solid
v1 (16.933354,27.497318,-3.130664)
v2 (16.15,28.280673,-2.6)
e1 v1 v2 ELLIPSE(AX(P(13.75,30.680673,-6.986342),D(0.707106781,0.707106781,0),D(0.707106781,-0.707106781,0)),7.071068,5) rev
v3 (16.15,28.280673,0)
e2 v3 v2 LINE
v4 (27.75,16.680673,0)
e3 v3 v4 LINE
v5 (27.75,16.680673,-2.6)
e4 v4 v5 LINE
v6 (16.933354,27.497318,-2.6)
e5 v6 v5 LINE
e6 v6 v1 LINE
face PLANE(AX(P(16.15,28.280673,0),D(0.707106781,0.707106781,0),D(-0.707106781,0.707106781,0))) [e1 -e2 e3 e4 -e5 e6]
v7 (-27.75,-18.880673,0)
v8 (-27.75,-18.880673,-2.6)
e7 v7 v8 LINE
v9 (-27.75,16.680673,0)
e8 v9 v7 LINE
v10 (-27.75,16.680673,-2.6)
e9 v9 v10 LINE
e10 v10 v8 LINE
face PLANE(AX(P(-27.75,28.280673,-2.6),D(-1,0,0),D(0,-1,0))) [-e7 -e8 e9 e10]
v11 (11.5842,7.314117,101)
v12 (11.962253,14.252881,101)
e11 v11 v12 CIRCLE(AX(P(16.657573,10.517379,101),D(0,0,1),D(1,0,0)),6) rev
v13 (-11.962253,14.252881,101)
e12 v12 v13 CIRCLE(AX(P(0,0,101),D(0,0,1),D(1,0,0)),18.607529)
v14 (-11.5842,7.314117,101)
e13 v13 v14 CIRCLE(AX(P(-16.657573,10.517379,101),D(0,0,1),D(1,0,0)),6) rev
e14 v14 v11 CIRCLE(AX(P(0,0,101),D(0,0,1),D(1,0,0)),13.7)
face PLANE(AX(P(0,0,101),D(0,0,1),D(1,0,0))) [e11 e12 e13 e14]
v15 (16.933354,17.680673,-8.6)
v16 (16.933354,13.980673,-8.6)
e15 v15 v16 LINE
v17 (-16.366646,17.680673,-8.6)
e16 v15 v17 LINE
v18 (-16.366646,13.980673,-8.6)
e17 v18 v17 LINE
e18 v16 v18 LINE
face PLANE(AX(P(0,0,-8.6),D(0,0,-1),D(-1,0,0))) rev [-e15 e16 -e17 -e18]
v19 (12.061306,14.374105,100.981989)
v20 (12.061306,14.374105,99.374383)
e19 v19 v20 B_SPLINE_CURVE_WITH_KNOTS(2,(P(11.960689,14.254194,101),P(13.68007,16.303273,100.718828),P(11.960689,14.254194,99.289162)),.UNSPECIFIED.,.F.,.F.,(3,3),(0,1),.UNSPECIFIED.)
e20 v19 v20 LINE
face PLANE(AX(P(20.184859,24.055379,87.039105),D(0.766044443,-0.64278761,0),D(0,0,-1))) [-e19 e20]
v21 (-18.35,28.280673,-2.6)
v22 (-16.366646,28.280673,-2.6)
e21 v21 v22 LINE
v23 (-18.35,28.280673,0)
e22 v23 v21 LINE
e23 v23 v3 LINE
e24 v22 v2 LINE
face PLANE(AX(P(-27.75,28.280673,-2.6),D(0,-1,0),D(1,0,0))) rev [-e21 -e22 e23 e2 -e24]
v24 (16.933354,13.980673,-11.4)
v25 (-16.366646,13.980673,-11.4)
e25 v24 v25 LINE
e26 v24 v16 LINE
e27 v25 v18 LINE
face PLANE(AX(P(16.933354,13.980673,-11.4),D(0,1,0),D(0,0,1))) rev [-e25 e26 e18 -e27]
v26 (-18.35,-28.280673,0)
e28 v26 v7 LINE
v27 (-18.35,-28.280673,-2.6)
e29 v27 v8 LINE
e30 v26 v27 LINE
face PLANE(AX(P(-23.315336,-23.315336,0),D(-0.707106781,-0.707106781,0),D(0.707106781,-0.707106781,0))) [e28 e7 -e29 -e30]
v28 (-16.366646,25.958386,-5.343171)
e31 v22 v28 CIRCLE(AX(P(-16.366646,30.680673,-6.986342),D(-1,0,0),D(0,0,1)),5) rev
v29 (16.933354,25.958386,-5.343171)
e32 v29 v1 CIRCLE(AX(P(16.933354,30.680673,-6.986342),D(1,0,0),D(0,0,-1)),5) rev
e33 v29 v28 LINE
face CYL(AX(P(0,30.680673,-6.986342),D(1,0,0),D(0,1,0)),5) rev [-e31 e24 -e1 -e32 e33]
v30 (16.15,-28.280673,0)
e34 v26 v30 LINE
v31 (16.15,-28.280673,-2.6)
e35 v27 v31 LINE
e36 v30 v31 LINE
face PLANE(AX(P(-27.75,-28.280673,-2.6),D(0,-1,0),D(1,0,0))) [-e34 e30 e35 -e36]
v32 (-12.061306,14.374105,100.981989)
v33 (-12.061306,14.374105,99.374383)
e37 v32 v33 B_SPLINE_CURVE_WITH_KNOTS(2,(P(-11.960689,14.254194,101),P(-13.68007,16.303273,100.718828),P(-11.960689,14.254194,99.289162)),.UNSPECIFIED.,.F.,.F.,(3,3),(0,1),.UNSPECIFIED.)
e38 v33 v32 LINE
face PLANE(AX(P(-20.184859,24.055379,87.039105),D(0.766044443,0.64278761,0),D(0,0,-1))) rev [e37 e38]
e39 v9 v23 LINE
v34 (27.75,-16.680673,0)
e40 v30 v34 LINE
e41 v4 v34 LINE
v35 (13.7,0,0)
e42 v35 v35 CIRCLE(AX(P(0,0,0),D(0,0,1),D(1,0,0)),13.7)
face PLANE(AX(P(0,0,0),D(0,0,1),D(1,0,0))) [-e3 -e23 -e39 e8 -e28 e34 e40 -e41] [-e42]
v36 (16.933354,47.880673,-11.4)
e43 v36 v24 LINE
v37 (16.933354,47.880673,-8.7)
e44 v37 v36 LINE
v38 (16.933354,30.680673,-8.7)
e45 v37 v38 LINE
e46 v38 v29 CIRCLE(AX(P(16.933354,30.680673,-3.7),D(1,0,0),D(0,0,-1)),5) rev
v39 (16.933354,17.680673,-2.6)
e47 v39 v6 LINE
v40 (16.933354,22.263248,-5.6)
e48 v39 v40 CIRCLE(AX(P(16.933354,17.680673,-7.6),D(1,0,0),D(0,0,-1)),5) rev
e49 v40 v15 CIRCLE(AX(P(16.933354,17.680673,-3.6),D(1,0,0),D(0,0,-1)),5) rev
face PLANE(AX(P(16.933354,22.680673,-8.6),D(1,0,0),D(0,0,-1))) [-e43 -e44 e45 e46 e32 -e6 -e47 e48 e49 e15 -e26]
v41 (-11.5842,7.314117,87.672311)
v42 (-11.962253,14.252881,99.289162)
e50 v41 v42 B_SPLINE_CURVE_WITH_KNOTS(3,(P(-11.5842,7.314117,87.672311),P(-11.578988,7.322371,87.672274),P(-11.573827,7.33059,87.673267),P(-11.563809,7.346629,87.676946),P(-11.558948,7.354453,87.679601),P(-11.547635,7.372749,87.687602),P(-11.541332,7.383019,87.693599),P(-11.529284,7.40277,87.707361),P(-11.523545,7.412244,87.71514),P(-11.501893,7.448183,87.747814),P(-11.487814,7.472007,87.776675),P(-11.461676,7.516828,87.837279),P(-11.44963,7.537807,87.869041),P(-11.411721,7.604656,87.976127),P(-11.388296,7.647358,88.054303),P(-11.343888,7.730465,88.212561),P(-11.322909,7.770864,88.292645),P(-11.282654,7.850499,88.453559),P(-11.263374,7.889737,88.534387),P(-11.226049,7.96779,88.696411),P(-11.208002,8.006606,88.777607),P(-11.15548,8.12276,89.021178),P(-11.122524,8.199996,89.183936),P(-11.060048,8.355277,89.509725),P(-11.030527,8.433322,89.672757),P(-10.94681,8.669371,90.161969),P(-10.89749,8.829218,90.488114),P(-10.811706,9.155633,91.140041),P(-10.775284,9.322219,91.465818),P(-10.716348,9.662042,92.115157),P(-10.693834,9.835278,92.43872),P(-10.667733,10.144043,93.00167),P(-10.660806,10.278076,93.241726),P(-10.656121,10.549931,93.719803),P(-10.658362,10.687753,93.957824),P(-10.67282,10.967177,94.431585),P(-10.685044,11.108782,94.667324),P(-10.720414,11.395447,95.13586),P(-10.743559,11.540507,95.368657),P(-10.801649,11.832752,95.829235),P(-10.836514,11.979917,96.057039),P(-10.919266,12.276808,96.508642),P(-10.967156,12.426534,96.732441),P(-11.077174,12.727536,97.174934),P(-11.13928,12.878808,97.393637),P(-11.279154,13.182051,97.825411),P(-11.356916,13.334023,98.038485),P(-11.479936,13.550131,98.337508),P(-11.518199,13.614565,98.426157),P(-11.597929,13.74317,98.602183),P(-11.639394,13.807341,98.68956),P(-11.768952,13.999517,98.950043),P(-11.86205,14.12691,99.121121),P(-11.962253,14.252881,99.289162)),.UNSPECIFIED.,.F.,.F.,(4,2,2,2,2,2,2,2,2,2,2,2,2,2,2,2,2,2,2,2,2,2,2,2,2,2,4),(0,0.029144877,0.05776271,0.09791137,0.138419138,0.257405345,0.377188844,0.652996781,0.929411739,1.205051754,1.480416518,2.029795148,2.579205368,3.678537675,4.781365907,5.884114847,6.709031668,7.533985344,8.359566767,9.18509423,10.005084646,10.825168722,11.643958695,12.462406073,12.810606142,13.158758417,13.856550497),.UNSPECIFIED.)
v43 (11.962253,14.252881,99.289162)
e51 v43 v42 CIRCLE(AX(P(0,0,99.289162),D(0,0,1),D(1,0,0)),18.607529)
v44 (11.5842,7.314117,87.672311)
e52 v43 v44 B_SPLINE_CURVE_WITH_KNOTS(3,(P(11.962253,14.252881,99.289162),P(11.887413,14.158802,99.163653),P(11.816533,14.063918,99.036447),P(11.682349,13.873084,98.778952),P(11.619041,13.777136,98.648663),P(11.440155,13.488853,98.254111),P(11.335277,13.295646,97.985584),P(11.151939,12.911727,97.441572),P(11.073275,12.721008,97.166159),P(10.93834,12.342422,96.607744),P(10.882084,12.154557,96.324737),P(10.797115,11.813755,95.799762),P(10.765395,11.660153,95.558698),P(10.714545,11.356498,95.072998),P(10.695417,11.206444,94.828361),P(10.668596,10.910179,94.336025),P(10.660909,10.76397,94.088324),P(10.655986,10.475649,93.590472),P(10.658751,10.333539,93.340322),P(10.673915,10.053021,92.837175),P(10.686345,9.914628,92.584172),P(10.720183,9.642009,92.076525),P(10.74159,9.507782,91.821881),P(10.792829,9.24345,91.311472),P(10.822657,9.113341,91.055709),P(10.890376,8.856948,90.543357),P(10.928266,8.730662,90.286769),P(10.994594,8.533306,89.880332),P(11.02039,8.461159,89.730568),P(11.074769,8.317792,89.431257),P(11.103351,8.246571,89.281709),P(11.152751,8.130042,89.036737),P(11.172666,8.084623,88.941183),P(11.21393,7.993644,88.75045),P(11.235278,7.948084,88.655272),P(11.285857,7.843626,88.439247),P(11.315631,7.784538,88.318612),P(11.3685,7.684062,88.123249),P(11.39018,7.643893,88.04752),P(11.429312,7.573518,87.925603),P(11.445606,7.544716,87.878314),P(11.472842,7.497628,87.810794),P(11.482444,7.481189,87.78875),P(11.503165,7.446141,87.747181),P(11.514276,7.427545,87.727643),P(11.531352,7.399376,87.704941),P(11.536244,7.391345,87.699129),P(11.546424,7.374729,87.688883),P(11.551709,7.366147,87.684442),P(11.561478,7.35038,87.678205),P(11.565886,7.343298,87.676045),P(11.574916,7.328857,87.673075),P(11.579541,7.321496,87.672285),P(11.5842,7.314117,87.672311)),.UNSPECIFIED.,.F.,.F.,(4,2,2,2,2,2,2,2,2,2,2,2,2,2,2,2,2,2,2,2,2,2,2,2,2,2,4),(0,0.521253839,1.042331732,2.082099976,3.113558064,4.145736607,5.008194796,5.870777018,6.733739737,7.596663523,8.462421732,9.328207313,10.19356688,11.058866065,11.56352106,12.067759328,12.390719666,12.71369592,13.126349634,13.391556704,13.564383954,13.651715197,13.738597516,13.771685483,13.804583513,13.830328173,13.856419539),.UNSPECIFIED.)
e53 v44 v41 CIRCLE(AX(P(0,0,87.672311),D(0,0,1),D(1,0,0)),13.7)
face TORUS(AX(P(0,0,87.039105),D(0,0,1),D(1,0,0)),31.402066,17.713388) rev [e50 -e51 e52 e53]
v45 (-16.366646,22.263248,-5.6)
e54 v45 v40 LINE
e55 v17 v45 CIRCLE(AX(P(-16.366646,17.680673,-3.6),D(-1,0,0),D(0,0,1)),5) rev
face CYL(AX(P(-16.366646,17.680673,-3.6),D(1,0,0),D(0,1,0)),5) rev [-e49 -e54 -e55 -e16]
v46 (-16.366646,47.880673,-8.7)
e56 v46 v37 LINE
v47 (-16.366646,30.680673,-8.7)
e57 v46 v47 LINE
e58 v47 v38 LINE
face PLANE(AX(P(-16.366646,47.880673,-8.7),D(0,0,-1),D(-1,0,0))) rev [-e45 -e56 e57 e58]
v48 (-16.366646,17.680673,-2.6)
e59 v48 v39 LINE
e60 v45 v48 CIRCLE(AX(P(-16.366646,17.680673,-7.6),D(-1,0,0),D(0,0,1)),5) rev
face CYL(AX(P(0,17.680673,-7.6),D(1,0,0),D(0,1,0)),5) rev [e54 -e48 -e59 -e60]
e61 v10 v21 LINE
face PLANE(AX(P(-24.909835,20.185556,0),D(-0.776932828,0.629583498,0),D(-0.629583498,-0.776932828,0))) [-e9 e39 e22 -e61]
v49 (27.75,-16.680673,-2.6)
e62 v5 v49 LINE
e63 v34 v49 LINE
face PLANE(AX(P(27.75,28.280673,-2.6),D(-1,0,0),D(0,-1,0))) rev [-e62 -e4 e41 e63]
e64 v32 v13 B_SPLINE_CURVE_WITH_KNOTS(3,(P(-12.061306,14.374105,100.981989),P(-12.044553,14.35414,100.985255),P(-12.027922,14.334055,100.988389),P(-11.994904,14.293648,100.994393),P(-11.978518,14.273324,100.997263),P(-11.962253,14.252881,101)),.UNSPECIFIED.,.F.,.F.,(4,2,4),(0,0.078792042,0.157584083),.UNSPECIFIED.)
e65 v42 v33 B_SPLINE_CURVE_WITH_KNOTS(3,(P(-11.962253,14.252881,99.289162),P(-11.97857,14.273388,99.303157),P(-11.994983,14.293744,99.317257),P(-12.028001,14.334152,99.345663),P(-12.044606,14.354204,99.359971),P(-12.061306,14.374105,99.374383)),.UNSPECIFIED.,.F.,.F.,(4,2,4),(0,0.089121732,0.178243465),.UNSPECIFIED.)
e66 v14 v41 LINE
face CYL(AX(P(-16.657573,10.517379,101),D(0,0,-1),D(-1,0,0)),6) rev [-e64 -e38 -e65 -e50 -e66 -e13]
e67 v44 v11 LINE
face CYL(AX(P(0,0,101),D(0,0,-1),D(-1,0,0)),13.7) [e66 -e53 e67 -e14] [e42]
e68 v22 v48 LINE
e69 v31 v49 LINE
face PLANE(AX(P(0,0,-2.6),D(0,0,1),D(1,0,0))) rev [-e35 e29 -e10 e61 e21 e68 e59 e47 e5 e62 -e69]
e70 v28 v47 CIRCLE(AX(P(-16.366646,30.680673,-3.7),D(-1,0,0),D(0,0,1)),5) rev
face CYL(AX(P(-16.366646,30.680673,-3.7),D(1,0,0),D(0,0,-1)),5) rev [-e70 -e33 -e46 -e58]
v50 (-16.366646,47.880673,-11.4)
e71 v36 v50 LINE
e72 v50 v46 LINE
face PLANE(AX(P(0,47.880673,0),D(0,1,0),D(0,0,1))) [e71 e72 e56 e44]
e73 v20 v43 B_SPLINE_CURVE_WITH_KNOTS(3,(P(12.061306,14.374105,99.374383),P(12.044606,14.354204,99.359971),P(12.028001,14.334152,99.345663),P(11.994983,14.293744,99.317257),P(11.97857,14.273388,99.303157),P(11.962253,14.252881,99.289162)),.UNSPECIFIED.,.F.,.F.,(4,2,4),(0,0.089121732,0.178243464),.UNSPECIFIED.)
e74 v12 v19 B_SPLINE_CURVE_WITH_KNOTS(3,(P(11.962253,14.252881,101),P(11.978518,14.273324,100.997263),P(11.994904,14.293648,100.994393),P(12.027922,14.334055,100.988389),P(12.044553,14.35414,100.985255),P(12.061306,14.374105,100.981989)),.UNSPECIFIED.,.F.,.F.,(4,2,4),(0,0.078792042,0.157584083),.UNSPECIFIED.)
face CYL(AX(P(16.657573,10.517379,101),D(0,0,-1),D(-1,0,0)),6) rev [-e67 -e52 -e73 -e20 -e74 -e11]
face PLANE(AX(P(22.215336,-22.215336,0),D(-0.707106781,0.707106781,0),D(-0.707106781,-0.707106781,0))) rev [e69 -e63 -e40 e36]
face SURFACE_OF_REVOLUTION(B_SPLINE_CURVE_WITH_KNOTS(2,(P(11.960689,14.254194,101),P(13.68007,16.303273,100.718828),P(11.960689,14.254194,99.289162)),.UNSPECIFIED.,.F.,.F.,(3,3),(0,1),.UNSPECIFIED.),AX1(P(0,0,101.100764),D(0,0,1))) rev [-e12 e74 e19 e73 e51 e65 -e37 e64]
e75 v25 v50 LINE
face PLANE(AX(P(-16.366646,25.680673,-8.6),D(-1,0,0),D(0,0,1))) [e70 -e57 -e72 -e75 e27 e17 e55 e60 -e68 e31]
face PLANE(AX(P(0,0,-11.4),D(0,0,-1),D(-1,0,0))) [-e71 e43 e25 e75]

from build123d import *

# Parameters (mm, degrees)
SKETCH1_R                = 13.7
BOSS_EXTRUDE1_DEPTH      = 101
SKETCH5_W                = 55.5
SKETCH5_H                = 56.561345004
BOSS_EXTRUDE2_DEPTH      = 2.6
CUT_EXTRUDE4_DEPTH       = 2.6
BOSS_EXTRUDE4_DEPTH      = 6
SKETCH8_W                = 33.3
SKETCH8_H                = 11.7
BOSS_EXTRUDE5_DEPTH      = 2.8
SKETCH9_W                = 33.3
SKETCH9_H                = 2.7
BOSS_EXTRUDE6_DEPTH      = 22.2
FILLET2_R                = 5
REVOLVE1_ANGLE           = 40
REVOLVE1_OTHER_WAY_ANGLE = 40
FILLET4_R                = 6
FILLET5_R                = 6


with BuildPart() as part:
    # Sketch1 → Boss-Extrude1 (new body)
    with BuildSketch(Plane.XY):
        with Locations(Location((0, 0, 0), (0, 0, 180))):
            Circle(SKETCH1_R)
    extrude(amount=BOSS_EXTRUDE1_DEPTH)

    # Sketch5 → Boss-Extrude2 (add)
    with BuildSketch(Plane(origin=(0, 0, 0), x_dir=(-1, 0, 0), z_dir=(0, 0, -1))):
        Rectangle(SKETCH5_W, SKETCH5_H)
    extrude(amount=BOSS_EXTRUDE2_DEPTH)

    # Sketch6 → Cut-Extrude4 (cut)
    with BuildSketch(Plane(origin=(0, 0, -2.6), x_dir=(-1, 0, 0), z_dir=(0, 0, -1))):
        Polygon((27.75, 28.280672502), (18.35, 28.280672502), (27.75, 16.680672502), align=None)
        Polygon((-16.15, -28.280672502), (-27.75, -16.680672502), (-27.75, -28.280672502), align=None)
        Polygon((27.75, -18.880672502), (18.35, -28.280672502), (27.75, -28.280672502), align=None)
        Polygon((-27.75, 16.680672502), (-27.75, 28.280672502), (-16.15, 28.280672502), align=None)
    extrude(amount=-CUT_EXTRUDE4_DEPTH, mode=Mode.SUBTRACT)

    # Sketch7 → Boss-Extrude4 (add)
    with BuildSketch(Plane(origin=(0, 0, -2.6), x_dir=(-1, 0, 0), z_dir=(0, 0, -1))):
        Polygon((1.1, 25.680672502), (16.366645995, 25.680672502), (16.366645995, 22.680672502), (-16.933354005, 22.680672502), (-16.933354005, 25.680672502), align=None)
    extrude(amount=BOSS_EXTRUDE4_DEPTH)

    # Sketch8 → Boss-Extrude5 (add)
    with BuildSketch(Plane(origin=(0, 0, -8.6), x_dir=(-1, 0, 0), z_dir=(0, 0, -1))):
        with Locations((-0.283354005, 19.830672502)):
            Rectangle(SKETCH8_W, SKETCH8_H)
    extrude(amount=BOSS_EXTRUDE5_DEPTH)

    # Sketch9 → Boss-Extrude6 (add)
    with BuildSketch(Plane(origin=(0, 25.680672502, 0), x_dir=(1, 0, 0), z_dir=(0, 1, 0))):
        with Locations((0.283354005, 10.05)):
            Rectangle(SKETCH9_W, SKETCH9_H)
    extrude(amount=BOSS_EXTRUDE6_DEPTH)

    # Fillet2
    # the kernel refuses this fillet: 5 mm, written as the material it adds along each edge
    with BuildSketch(Plane(origin=(-16.366645995, 25.680672502, -2.6), x_dir=(0, 1, 0), z_dir=(1, 0, 0))) as fillet2_piece_1_section:
        with BuildLine():
            CenterArc((5, -4.38634244), FILLET2_R, 118.685402014, 61.314597986)
            Line((0, -4.38634244), (-0.1, -4.38634244))
            Line((-0.1, -4.38634244), (-0.1, 0))
            Line((-0.1, 0), (0, 0.1))
            ThreePointArc((0, 0.1), (1.3, 0.1), (2.552, 0.087726849))
            Line((2.552, 0.087726849), (2.6, 0))
        make_face()
    fillet2_piece_1 = extrude(amount=33.3, mode=Mode.PRIVATE)
    fillet2_piece_1 = split(fillet2_piece_1, bisect_by=Plane(origin=(9.175527955, 35.255144547, -3.690317045), z_dir=(-0.7071067811865442, -0.7071067811865509, 0)), keep=Keep.TOP, mode=Mode.PRIVATE)
    add(fillet2_piece_1)
    with BuildSketch(Plane(origin=(-16.366645995, 22.680672502, -2.6), x_dir=(0, -1, 0), z_dir=(1, 0, 0))) as fillet2_piece_2:
        with BuildLine():
            CenterArc((FILLET2_R, FILLET2_R), FILLET2_R, 180, 90)
            Line((0, FILLET2_R), (-FILLET2_R * 0.02, FILLET2_R))
            Line((-FILLET2_R * 0.02, FILLET2_R), (-FILLET2_R * 0.02, -FILLET2_R * 0.02))
            Line((-FILLET2_R * 0.02, -FILLET2_R * 0.02), (FILLET2_R, -FILLET2_R * 0.02))
            Line((FILLET2_R, -FILLET2_R * 0.02), (FILLET2_R, 0))
        make_face()
    extrude(amount=33.3)
    with BuildSketch(Plane(origin=(-16.366645995, 22.680672502, -8.6), x_dir=(0, -1, 0), z_dir=(1, 0, 0)), Plane(origin=(16.933354005, 25.680672502, -8.7), x_dir=(0, 1, 0), z_dir=(-1, 0, 0))) as fillet2_piece_3:
        with BuildLine():
            CenterArc((FILLET2_R, -FILLET2_R), FILLET2_R, 90, 90)
            Line((0, -FILLET2_R), (-FILLET2_R * 0.02, -FILLET2_R))
            Line((-FILLET2_R * 0.02, -FILLET2_R), (-FILLET2_R * 0.02, FILLET2_R * 0.02))
            Line((-FILLET2_R * 0.02, FILLET2_R * 0.02), (FILLET2_R, FILLET2_R * 0.02))
            Line((FILLET2_R, FILLET2_R * 0.02), (FILLET2_R, 0))
        make_face()
    extrude(amount=33.3)

    # Sketch10 → Revolve1 (revolve)
    with BuildSketch(Plane.ZY):
        with BuildLine():
            Line((101, 13.7), (101, 18.607528808))
            add(Edge.make_bspline(
                [(101, 18.607528808), (100.71882797, 21.282411004), (99.289162218, 18.607528808)],
                knots=[0, 0, 0, 1, 1, 1], degree=2))
            ThreePointArc((99.289162218, 18.607528808), (93.932259194, 15.08494276), (87.67231063, 13.7))
            Line((87.67231063, 13.7), (101, 13.7))
        make_face()
    revolve(axis=Axis((0, 0, 101.100764075), (0, 0, -1)), revolution_arc=REVOLVE1_ANGLE)

    # Sketch10 → Revolve1 other way (revolve)
    with BuildSketch(Plane.ZY):
        with BuildLine():
            Line((101, 13.7), (101, 18.607528808))
            add(Edge.make_bspline(
                [(101, 18.607528808), (100.71882797, 21.282411004), (99.289162218, 18.607528808)],
                knots=[0, 0, 0, 1, 1, 1], degree=2))
            ThreePointArc((99.289162218, 18.607528808), (93.932259194, 15.08494276), (87.67231063, 13.7))
            Line((87.67231063, 13.7), (101, 13.7))
        make_face()
    revolve(axis=Axis((0, 0, 101.100764075), (0, 0, 1)), revolution_arc=REVOLVE1_OTHER_WAY_ANGLE)

    # Fillet4
    fillet4_edges = [part.edges().sort_by_distance(p)[0] for p in [
        (8.806190253, 10.494808871, 94.336155315),
    ]]
    fillet(fillet4_edges, radius=FILLET4_R)

    # Fillet5
    fillet5_edges = [part.edges().sort_by_distance(p)[0] for p in [
        (-8.806190253, 10.494808871, 94.336155315),
    ]]
    fillet(fillet5_edges, radius=FILLET5_R)


solid = part.part
